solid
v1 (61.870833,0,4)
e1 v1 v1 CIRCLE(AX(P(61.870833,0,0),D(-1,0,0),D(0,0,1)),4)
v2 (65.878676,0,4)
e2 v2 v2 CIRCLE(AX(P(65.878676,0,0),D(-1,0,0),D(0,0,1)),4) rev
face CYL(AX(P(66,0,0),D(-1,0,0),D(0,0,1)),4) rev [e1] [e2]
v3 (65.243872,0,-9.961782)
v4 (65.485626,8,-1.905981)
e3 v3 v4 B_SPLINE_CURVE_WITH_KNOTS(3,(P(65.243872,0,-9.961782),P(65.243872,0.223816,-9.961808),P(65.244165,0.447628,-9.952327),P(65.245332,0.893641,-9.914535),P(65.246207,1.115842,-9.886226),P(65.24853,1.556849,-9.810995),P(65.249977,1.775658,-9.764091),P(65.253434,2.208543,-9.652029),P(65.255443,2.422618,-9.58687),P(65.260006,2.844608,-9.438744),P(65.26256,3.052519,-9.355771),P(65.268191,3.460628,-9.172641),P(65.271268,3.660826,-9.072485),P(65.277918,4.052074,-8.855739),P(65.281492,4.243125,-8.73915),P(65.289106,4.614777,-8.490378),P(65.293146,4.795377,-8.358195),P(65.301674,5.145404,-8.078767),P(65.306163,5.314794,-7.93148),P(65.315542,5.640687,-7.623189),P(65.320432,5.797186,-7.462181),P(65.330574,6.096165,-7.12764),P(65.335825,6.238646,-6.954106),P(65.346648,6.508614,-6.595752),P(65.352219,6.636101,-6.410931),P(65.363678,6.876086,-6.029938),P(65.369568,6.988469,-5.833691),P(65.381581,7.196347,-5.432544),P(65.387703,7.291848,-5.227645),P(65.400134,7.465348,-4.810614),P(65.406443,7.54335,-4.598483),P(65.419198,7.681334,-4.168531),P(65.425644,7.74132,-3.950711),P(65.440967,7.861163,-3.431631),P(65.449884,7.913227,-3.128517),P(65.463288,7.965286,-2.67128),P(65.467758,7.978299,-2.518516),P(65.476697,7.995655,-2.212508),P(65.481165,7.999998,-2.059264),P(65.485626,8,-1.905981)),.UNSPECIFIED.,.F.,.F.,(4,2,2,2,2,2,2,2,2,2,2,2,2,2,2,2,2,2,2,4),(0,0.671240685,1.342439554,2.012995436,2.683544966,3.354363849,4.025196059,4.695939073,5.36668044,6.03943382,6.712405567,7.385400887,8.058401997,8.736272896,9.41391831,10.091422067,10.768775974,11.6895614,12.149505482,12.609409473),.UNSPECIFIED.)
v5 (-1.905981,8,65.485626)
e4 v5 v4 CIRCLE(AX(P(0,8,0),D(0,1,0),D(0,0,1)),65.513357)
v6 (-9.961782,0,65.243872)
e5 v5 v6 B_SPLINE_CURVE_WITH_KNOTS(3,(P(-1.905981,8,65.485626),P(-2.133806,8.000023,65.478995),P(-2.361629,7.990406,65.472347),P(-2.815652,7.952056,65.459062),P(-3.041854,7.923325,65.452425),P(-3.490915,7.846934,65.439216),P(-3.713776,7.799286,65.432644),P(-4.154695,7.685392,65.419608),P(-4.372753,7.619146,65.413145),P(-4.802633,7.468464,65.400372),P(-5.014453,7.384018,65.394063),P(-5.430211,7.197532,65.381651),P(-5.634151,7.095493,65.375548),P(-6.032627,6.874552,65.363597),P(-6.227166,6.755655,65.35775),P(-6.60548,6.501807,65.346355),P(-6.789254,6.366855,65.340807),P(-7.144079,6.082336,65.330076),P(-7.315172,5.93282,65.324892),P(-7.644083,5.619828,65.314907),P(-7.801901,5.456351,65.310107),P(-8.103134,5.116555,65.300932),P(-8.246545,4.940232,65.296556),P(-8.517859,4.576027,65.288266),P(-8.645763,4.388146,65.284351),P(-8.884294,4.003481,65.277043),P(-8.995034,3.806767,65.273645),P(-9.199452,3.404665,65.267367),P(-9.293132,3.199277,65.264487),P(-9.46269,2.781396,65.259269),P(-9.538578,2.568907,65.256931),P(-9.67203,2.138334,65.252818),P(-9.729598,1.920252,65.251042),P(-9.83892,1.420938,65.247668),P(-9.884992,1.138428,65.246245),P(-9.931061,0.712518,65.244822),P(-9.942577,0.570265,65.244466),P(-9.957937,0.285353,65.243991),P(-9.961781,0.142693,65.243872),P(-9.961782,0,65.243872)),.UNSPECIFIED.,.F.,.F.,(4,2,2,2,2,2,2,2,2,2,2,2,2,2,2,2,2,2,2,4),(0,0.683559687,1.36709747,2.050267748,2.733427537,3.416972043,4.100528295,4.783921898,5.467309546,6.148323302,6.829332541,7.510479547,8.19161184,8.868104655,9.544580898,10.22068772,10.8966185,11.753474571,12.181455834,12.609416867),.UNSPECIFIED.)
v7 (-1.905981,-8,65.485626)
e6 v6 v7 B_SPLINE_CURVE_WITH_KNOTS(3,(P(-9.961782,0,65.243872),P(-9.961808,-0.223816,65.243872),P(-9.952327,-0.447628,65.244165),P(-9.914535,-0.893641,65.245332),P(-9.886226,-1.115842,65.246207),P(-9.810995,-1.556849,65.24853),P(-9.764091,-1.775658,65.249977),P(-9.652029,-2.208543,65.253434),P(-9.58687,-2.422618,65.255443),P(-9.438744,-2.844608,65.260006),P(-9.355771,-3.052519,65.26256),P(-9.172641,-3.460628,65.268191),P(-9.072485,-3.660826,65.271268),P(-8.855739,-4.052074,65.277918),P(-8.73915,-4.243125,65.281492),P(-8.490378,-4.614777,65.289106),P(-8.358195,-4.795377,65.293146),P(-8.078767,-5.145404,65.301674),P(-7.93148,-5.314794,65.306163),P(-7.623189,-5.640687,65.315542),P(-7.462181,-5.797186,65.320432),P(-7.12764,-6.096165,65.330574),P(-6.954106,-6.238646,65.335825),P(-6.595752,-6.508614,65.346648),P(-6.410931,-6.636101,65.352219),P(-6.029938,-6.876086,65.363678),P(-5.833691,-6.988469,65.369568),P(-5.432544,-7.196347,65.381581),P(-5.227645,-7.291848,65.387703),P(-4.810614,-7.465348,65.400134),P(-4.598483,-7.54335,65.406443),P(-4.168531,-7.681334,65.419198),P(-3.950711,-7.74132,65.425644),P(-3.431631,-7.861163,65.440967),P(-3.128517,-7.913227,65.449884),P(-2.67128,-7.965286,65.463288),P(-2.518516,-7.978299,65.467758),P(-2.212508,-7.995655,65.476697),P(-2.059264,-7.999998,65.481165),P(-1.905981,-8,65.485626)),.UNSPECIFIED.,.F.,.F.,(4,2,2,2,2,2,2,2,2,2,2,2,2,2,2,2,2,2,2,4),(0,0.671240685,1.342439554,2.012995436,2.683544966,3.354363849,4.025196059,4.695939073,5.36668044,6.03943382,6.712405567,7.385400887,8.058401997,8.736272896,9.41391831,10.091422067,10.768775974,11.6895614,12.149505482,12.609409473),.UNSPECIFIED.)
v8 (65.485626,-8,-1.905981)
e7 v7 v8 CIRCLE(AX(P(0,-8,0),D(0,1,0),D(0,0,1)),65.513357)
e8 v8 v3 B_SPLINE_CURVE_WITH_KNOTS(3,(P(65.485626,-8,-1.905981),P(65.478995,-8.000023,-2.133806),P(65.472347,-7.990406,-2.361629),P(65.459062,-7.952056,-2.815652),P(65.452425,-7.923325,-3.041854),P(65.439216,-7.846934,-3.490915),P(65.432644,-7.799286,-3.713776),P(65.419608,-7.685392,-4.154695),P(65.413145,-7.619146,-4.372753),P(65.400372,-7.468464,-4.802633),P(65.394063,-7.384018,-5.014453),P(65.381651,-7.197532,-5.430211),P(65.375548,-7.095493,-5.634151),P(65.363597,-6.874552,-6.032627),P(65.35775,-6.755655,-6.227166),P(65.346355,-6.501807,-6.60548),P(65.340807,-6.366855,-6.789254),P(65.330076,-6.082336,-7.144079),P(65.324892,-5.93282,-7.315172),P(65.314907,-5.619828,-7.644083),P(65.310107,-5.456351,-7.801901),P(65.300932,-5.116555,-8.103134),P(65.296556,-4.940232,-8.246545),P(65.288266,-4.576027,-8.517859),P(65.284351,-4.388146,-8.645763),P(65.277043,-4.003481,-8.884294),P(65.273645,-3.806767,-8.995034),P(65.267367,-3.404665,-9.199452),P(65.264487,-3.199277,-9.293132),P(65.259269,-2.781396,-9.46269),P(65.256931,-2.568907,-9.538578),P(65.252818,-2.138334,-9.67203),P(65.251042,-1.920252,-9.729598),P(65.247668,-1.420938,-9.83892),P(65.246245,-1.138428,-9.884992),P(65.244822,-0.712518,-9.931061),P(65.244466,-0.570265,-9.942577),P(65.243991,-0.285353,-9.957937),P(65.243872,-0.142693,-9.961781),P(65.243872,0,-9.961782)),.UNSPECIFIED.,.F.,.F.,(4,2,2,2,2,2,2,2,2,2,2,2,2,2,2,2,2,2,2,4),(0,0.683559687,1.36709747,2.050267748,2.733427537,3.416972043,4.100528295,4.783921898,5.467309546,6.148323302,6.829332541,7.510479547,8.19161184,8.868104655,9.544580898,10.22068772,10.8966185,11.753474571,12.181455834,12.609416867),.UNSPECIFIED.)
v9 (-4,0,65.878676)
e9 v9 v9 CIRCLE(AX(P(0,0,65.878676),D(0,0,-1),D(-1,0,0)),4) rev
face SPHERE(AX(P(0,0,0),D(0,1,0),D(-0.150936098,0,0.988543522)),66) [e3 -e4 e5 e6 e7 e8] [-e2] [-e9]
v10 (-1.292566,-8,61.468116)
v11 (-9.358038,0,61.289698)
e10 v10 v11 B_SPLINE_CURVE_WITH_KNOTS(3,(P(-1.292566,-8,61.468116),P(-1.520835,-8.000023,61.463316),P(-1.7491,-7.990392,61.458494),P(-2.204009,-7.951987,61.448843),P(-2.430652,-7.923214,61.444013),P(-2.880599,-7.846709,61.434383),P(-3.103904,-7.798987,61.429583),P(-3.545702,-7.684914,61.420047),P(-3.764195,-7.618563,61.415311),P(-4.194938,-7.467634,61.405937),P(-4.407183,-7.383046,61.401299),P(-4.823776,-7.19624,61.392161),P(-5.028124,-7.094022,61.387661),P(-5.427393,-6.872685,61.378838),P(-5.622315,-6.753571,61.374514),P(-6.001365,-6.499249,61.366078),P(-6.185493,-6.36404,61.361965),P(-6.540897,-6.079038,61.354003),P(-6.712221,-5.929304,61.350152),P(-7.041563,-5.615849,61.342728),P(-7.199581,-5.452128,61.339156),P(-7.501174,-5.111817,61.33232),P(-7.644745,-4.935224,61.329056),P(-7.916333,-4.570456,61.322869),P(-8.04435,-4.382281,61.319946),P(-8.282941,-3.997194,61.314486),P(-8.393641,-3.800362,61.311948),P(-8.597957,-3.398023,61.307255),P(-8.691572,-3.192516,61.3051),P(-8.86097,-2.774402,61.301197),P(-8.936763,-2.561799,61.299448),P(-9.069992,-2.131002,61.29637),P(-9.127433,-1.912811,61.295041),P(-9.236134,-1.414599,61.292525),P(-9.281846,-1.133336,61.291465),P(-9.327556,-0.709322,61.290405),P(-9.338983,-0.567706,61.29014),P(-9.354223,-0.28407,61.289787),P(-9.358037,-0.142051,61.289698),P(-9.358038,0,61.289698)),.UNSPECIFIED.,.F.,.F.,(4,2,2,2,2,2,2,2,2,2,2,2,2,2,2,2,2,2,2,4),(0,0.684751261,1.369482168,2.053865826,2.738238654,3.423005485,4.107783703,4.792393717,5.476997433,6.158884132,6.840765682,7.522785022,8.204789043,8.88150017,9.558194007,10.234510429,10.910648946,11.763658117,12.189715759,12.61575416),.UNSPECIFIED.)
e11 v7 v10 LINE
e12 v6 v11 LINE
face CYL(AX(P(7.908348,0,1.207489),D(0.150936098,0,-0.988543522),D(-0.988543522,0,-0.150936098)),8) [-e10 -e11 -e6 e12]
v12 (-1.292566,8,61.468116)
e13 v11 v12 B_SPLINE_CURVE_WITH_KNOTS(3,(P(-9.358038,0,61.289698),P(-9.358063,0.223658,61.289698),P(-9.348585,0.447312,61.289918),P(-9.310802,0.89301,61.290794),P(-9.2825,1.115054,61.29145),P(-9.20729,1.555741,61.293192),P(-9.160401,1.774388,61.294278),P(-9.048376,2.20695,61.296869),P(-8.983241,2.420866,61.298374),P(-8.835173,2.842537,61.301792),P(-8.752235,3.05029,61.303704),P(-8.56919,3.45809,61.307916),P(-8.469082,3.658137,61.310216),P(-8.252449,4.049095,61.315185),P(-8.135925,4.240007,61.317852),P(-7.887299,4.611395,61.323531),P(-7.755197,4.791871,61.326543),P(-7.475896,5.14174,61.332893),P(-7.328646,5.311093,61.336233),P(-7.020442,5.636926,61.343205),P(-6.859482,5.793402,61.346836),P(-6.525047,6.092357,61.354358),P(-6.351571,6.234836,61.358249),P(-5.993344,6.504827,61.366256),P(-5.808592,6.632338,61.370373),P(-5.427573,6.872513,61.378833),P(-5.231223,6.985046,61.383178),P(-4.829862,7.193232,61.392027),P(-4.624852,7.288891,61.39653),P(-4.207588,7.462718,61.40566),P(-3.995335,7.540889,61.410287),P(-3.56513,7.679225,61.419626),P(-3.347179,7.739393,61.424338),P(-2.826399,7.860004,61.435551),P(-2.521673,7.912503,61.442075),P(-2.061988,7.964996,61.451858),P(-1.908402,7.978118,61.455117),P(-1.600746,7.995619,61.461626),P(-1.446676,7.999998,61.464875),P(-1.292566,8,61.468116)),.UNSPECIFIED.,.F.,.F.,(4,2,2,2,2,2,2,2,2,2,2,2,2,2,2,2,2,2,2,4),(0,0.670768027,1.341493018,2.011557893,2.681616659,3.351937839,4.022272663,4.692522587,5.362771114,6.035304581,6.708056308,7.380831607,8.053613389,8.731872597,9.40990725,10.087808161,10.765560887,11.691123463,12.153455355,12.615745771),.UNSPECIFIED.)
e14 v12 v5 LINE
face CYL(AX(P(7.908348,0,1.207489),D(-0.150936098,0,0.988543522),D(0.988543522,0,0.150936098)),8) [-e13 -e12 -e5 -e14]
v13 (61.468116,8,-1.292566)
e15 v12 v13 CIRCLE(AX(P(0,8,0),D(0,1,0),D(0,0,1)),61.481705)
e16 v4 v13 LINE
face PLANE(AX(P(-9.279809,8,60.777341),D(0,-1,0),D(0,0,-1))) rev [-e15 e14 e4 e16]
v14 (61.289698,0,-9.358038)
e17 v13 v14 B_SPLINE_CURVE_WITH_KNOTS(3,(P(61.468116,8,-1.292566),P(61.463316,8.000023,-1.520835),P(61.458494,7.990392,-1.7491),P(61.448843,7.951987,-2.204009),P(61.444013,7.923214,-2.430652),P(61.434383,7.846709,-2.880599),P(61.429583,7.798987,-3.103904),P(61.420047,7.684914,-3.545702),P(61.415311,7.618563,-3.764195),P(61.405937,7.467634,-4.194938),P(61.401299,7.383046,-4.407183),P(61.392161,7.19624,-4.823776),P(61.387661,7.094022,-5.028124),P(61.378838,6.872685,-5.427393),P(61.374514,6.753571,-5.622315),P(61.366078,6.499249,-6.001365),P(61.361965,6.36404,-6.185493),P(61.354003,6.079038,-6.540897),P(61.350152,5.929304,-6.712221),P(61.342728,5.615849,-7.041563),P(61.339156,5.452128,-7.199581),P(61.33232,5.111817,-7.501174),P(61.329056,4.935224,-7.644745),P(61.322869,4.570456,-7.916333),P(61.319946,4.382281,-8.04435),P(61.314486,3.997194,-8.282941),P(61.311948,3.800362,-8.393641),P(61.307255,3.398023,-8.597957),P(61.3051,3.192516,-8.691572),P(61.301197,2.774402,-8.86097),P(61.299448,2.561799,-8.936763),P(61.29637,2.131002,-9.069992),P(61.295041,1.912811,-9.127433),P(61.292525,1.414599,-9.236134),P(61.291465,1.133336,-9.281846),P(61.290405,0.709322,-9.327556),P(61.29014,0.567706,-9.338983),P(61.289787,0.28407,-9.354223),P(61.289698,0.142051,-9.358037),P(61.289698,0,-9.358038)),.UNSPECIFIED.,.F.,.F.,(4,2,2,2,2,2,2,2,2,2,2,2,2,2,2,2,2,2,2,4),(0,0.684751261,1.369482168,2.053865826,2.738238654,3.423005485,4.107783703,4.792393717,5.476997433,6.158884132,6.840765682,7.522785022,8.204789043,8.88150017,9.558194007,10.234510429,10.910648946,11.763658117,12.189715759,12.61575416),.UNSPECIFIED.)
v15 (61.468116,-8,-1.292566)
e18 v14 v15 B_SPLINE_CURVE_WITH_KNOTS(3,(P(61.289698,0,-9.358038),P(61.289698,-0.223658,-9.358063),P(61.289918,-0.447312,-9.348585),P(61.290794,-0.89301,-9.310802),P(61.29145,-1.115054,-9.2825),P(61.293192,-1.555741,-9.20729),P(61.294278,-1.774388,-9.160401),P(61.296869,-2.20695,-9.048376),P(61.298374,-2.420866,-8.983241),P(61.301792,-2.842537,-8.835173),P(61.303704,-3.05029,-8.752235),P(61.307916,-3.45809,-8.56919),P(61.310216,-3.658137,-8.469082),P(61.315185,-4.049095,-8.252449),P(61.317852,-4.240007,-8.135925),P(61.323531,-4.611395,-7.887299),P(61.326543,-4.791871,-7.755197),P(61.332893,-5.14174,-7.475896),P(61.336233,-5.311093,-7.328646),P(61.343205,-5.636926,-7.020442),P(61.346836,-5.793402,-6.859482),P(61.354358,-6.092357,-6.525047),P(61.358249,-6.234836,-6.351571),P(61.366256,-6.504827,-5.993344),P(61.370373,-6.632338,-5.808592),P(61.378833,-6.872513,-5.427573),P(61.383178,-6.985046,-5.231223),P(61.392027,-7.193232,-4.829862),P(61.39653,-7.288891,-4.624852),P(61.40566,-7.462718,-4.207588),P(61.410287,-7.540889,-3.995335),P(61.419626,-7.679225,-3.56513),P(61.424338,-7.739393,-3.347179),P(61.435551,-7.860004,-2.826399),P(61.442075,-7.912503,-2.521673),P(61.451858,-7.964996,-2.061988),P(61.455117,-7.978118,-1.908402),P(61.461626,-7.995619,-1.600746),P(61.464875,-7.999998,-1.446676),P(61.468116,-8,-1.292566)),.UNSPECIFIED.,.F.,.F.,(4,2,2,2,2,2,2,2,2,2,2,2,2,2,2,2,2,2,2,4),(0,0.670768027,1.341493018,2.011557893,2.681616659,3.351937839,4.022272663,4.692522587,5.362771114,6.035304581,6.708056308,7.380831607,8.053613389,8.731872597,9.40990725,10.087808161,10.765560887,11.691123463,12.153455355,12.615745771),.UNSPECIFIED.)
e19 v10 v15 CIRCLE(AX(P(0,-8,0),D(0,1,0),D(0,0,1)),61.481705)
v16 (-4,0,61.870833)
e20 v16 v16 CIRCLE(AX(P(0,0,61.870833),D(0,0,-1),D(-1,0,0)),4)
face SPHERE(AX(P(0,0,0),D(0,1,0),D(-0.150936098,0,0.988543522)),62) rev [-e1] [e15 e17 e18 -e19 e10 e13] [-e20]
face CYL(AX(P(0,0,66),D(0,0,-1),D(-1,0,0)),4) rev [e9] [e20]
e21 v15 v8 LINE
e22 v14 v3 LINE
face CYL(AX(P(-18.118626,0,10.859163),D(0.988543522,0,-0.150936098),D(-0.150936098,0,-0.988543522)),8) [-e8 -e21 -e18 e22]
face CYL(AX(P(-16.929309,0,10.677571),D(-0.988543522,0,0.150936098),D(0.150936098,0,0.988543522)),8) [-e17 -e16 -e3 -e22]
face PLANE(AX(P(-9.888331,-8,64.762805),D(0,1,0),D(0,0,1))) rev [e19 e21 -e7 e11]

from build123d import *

# Parameters (mm, degrees)
REVOLVE_1_ANGLE           = 98.68117871
REVOLVE_1_OTHER_WAY_ANGLE = 8.68117871
SKETCH_3_R                = 4
CUT_EXTRUDE_1_DEPTH       = 94.680307429
SKETCH_4_R                = 4
CUT_EXTRUDE_2_DEPTH       = 94.59487173
FILLET_START              = -16.507933569
FILLET_1_DEPTH            = 83.507933569
FILLET_START_2            = -67
FILLET_1_2_DEPTH          = 83.255659247


with BuildPart() as part:
    # 草图2 → 旋转1 (revolve)
    with BuildSketch(Plane.XY):
        with BuildLine():
            Line((61.481704596, 8), (65.513357417, 8))
            ThreePointArc((65.513357417, 8), (66, 0), (65.513357417, -8))
            Line((65.513357417, -8), (61.481704596, -8))
            ThreePointArc((61.481704596, -8), (62, 0), (61.481704596, 8))
        make_face()
    revolve(axis=Axis((0, 0, 0), (0, -1, 0)), revolution_arc=REVOLVE_1_ANGLE)

    # 草图2 → 旋转1 other way (revolve)
    with BuildSketch(Plane.XY):
        with BuildLine():
            Line((61.481704596, 8), (65.513357417, 8))
            ThreePointArc((65.513357417, 8), (66, 0), (65.513357417, -8))
            Line((65.513357417, -8), (61.481704596, -8))
            ThreePointArc((61.481704596, -8), (62, 0), (61.481704596, 8))
        make_face()
    revolve(axis=Axis((0, 0, 0), (0, 1, 0)), revolution_arc=REVOLVE_1_OTHER_WAY_ANGLE)

    # 草图3 → 切除-拉伸1 (cut, through all)
    with BuildSketch(Plane.XY):
        with Locations(Location((0, 0, 0), (0, 0, 180))):
            Circle(SKETCH_3_R)
    extrude(amount=CUT_EXTRUDE_1_DEPTH, mode=Mode.SUBTRACT)

    # 草图4 → 切除-拉伸2 (cut, through all)
    with BuildSketch(Plane(origin=(0, 0, 0), x_dir=(0, 0, -1), z_dir=(1, 0, 0))):
        with Locations(Location((0, 0, 0), (0, 0, 180))):
            Circle(SKETCH_4_R)
    extrude(amount=CUT_EXTRUDE_2_DEPTH, mode=Mode.SUBTRACT)

    # 圆角1: read off the stored shape, not the designer's step
    # 圆角1 outline → 圆角1 (cut)
    with BuildSketch(Plane(origin=(0, 0, 0), x_dir=(0, 1, 0), z_dir=(0.9885435216678343, 0, -0.15093609829512605)).offset(FILLET_START)):
        with BuildLine():
            Line((8, 0), (8, 8))
            ThreePointArc((8, 8), (5.656854249, 2.343145751), (0, 0))
            Line((0, 0), (8, 0))
        make_face()
        with BuildLine():
            Line((-8, 0), (0, 0))
            ThreePointArc((0, 0), (-5.656854249, 2.343145751), (-8, 8))
            Line((-8, 8), (-8, 0))
        make_face()
    extrude(amount=FILLET_1_DEPTH, mode=Mode.SUBTRACT)

    # Fillet 1 2 outline → Fillet 1 2 (cut)
    with BuildSketch(Plane(origin=(0, 0, 0), x_dir=(0.9885435216678338, 0, 0.15093609829512997), z_dir=(0.15093609829512997, 0, -0.9885435216678338)).offset(FILLET_START_2)):
        with BuildLine():
            Line((0, -8), (8, -8))
            ThreePointArc((8, -8), (2.343145751, -5.656854249), (0, 0))
            Line((0, 0), (0, -8))
        make_face()
        with BuildLine():
            Line((0, 8), (0, 0))
            ThreePointArc((0, 0), (2.343145751, 5.656854249), (8, 8))
            Line((8, 8), (0, 8))
        make_face()
    extrude(amount=FILLET_1_2_DEPTH, mode=Mode.SUBTRACT)


solid = part.part
